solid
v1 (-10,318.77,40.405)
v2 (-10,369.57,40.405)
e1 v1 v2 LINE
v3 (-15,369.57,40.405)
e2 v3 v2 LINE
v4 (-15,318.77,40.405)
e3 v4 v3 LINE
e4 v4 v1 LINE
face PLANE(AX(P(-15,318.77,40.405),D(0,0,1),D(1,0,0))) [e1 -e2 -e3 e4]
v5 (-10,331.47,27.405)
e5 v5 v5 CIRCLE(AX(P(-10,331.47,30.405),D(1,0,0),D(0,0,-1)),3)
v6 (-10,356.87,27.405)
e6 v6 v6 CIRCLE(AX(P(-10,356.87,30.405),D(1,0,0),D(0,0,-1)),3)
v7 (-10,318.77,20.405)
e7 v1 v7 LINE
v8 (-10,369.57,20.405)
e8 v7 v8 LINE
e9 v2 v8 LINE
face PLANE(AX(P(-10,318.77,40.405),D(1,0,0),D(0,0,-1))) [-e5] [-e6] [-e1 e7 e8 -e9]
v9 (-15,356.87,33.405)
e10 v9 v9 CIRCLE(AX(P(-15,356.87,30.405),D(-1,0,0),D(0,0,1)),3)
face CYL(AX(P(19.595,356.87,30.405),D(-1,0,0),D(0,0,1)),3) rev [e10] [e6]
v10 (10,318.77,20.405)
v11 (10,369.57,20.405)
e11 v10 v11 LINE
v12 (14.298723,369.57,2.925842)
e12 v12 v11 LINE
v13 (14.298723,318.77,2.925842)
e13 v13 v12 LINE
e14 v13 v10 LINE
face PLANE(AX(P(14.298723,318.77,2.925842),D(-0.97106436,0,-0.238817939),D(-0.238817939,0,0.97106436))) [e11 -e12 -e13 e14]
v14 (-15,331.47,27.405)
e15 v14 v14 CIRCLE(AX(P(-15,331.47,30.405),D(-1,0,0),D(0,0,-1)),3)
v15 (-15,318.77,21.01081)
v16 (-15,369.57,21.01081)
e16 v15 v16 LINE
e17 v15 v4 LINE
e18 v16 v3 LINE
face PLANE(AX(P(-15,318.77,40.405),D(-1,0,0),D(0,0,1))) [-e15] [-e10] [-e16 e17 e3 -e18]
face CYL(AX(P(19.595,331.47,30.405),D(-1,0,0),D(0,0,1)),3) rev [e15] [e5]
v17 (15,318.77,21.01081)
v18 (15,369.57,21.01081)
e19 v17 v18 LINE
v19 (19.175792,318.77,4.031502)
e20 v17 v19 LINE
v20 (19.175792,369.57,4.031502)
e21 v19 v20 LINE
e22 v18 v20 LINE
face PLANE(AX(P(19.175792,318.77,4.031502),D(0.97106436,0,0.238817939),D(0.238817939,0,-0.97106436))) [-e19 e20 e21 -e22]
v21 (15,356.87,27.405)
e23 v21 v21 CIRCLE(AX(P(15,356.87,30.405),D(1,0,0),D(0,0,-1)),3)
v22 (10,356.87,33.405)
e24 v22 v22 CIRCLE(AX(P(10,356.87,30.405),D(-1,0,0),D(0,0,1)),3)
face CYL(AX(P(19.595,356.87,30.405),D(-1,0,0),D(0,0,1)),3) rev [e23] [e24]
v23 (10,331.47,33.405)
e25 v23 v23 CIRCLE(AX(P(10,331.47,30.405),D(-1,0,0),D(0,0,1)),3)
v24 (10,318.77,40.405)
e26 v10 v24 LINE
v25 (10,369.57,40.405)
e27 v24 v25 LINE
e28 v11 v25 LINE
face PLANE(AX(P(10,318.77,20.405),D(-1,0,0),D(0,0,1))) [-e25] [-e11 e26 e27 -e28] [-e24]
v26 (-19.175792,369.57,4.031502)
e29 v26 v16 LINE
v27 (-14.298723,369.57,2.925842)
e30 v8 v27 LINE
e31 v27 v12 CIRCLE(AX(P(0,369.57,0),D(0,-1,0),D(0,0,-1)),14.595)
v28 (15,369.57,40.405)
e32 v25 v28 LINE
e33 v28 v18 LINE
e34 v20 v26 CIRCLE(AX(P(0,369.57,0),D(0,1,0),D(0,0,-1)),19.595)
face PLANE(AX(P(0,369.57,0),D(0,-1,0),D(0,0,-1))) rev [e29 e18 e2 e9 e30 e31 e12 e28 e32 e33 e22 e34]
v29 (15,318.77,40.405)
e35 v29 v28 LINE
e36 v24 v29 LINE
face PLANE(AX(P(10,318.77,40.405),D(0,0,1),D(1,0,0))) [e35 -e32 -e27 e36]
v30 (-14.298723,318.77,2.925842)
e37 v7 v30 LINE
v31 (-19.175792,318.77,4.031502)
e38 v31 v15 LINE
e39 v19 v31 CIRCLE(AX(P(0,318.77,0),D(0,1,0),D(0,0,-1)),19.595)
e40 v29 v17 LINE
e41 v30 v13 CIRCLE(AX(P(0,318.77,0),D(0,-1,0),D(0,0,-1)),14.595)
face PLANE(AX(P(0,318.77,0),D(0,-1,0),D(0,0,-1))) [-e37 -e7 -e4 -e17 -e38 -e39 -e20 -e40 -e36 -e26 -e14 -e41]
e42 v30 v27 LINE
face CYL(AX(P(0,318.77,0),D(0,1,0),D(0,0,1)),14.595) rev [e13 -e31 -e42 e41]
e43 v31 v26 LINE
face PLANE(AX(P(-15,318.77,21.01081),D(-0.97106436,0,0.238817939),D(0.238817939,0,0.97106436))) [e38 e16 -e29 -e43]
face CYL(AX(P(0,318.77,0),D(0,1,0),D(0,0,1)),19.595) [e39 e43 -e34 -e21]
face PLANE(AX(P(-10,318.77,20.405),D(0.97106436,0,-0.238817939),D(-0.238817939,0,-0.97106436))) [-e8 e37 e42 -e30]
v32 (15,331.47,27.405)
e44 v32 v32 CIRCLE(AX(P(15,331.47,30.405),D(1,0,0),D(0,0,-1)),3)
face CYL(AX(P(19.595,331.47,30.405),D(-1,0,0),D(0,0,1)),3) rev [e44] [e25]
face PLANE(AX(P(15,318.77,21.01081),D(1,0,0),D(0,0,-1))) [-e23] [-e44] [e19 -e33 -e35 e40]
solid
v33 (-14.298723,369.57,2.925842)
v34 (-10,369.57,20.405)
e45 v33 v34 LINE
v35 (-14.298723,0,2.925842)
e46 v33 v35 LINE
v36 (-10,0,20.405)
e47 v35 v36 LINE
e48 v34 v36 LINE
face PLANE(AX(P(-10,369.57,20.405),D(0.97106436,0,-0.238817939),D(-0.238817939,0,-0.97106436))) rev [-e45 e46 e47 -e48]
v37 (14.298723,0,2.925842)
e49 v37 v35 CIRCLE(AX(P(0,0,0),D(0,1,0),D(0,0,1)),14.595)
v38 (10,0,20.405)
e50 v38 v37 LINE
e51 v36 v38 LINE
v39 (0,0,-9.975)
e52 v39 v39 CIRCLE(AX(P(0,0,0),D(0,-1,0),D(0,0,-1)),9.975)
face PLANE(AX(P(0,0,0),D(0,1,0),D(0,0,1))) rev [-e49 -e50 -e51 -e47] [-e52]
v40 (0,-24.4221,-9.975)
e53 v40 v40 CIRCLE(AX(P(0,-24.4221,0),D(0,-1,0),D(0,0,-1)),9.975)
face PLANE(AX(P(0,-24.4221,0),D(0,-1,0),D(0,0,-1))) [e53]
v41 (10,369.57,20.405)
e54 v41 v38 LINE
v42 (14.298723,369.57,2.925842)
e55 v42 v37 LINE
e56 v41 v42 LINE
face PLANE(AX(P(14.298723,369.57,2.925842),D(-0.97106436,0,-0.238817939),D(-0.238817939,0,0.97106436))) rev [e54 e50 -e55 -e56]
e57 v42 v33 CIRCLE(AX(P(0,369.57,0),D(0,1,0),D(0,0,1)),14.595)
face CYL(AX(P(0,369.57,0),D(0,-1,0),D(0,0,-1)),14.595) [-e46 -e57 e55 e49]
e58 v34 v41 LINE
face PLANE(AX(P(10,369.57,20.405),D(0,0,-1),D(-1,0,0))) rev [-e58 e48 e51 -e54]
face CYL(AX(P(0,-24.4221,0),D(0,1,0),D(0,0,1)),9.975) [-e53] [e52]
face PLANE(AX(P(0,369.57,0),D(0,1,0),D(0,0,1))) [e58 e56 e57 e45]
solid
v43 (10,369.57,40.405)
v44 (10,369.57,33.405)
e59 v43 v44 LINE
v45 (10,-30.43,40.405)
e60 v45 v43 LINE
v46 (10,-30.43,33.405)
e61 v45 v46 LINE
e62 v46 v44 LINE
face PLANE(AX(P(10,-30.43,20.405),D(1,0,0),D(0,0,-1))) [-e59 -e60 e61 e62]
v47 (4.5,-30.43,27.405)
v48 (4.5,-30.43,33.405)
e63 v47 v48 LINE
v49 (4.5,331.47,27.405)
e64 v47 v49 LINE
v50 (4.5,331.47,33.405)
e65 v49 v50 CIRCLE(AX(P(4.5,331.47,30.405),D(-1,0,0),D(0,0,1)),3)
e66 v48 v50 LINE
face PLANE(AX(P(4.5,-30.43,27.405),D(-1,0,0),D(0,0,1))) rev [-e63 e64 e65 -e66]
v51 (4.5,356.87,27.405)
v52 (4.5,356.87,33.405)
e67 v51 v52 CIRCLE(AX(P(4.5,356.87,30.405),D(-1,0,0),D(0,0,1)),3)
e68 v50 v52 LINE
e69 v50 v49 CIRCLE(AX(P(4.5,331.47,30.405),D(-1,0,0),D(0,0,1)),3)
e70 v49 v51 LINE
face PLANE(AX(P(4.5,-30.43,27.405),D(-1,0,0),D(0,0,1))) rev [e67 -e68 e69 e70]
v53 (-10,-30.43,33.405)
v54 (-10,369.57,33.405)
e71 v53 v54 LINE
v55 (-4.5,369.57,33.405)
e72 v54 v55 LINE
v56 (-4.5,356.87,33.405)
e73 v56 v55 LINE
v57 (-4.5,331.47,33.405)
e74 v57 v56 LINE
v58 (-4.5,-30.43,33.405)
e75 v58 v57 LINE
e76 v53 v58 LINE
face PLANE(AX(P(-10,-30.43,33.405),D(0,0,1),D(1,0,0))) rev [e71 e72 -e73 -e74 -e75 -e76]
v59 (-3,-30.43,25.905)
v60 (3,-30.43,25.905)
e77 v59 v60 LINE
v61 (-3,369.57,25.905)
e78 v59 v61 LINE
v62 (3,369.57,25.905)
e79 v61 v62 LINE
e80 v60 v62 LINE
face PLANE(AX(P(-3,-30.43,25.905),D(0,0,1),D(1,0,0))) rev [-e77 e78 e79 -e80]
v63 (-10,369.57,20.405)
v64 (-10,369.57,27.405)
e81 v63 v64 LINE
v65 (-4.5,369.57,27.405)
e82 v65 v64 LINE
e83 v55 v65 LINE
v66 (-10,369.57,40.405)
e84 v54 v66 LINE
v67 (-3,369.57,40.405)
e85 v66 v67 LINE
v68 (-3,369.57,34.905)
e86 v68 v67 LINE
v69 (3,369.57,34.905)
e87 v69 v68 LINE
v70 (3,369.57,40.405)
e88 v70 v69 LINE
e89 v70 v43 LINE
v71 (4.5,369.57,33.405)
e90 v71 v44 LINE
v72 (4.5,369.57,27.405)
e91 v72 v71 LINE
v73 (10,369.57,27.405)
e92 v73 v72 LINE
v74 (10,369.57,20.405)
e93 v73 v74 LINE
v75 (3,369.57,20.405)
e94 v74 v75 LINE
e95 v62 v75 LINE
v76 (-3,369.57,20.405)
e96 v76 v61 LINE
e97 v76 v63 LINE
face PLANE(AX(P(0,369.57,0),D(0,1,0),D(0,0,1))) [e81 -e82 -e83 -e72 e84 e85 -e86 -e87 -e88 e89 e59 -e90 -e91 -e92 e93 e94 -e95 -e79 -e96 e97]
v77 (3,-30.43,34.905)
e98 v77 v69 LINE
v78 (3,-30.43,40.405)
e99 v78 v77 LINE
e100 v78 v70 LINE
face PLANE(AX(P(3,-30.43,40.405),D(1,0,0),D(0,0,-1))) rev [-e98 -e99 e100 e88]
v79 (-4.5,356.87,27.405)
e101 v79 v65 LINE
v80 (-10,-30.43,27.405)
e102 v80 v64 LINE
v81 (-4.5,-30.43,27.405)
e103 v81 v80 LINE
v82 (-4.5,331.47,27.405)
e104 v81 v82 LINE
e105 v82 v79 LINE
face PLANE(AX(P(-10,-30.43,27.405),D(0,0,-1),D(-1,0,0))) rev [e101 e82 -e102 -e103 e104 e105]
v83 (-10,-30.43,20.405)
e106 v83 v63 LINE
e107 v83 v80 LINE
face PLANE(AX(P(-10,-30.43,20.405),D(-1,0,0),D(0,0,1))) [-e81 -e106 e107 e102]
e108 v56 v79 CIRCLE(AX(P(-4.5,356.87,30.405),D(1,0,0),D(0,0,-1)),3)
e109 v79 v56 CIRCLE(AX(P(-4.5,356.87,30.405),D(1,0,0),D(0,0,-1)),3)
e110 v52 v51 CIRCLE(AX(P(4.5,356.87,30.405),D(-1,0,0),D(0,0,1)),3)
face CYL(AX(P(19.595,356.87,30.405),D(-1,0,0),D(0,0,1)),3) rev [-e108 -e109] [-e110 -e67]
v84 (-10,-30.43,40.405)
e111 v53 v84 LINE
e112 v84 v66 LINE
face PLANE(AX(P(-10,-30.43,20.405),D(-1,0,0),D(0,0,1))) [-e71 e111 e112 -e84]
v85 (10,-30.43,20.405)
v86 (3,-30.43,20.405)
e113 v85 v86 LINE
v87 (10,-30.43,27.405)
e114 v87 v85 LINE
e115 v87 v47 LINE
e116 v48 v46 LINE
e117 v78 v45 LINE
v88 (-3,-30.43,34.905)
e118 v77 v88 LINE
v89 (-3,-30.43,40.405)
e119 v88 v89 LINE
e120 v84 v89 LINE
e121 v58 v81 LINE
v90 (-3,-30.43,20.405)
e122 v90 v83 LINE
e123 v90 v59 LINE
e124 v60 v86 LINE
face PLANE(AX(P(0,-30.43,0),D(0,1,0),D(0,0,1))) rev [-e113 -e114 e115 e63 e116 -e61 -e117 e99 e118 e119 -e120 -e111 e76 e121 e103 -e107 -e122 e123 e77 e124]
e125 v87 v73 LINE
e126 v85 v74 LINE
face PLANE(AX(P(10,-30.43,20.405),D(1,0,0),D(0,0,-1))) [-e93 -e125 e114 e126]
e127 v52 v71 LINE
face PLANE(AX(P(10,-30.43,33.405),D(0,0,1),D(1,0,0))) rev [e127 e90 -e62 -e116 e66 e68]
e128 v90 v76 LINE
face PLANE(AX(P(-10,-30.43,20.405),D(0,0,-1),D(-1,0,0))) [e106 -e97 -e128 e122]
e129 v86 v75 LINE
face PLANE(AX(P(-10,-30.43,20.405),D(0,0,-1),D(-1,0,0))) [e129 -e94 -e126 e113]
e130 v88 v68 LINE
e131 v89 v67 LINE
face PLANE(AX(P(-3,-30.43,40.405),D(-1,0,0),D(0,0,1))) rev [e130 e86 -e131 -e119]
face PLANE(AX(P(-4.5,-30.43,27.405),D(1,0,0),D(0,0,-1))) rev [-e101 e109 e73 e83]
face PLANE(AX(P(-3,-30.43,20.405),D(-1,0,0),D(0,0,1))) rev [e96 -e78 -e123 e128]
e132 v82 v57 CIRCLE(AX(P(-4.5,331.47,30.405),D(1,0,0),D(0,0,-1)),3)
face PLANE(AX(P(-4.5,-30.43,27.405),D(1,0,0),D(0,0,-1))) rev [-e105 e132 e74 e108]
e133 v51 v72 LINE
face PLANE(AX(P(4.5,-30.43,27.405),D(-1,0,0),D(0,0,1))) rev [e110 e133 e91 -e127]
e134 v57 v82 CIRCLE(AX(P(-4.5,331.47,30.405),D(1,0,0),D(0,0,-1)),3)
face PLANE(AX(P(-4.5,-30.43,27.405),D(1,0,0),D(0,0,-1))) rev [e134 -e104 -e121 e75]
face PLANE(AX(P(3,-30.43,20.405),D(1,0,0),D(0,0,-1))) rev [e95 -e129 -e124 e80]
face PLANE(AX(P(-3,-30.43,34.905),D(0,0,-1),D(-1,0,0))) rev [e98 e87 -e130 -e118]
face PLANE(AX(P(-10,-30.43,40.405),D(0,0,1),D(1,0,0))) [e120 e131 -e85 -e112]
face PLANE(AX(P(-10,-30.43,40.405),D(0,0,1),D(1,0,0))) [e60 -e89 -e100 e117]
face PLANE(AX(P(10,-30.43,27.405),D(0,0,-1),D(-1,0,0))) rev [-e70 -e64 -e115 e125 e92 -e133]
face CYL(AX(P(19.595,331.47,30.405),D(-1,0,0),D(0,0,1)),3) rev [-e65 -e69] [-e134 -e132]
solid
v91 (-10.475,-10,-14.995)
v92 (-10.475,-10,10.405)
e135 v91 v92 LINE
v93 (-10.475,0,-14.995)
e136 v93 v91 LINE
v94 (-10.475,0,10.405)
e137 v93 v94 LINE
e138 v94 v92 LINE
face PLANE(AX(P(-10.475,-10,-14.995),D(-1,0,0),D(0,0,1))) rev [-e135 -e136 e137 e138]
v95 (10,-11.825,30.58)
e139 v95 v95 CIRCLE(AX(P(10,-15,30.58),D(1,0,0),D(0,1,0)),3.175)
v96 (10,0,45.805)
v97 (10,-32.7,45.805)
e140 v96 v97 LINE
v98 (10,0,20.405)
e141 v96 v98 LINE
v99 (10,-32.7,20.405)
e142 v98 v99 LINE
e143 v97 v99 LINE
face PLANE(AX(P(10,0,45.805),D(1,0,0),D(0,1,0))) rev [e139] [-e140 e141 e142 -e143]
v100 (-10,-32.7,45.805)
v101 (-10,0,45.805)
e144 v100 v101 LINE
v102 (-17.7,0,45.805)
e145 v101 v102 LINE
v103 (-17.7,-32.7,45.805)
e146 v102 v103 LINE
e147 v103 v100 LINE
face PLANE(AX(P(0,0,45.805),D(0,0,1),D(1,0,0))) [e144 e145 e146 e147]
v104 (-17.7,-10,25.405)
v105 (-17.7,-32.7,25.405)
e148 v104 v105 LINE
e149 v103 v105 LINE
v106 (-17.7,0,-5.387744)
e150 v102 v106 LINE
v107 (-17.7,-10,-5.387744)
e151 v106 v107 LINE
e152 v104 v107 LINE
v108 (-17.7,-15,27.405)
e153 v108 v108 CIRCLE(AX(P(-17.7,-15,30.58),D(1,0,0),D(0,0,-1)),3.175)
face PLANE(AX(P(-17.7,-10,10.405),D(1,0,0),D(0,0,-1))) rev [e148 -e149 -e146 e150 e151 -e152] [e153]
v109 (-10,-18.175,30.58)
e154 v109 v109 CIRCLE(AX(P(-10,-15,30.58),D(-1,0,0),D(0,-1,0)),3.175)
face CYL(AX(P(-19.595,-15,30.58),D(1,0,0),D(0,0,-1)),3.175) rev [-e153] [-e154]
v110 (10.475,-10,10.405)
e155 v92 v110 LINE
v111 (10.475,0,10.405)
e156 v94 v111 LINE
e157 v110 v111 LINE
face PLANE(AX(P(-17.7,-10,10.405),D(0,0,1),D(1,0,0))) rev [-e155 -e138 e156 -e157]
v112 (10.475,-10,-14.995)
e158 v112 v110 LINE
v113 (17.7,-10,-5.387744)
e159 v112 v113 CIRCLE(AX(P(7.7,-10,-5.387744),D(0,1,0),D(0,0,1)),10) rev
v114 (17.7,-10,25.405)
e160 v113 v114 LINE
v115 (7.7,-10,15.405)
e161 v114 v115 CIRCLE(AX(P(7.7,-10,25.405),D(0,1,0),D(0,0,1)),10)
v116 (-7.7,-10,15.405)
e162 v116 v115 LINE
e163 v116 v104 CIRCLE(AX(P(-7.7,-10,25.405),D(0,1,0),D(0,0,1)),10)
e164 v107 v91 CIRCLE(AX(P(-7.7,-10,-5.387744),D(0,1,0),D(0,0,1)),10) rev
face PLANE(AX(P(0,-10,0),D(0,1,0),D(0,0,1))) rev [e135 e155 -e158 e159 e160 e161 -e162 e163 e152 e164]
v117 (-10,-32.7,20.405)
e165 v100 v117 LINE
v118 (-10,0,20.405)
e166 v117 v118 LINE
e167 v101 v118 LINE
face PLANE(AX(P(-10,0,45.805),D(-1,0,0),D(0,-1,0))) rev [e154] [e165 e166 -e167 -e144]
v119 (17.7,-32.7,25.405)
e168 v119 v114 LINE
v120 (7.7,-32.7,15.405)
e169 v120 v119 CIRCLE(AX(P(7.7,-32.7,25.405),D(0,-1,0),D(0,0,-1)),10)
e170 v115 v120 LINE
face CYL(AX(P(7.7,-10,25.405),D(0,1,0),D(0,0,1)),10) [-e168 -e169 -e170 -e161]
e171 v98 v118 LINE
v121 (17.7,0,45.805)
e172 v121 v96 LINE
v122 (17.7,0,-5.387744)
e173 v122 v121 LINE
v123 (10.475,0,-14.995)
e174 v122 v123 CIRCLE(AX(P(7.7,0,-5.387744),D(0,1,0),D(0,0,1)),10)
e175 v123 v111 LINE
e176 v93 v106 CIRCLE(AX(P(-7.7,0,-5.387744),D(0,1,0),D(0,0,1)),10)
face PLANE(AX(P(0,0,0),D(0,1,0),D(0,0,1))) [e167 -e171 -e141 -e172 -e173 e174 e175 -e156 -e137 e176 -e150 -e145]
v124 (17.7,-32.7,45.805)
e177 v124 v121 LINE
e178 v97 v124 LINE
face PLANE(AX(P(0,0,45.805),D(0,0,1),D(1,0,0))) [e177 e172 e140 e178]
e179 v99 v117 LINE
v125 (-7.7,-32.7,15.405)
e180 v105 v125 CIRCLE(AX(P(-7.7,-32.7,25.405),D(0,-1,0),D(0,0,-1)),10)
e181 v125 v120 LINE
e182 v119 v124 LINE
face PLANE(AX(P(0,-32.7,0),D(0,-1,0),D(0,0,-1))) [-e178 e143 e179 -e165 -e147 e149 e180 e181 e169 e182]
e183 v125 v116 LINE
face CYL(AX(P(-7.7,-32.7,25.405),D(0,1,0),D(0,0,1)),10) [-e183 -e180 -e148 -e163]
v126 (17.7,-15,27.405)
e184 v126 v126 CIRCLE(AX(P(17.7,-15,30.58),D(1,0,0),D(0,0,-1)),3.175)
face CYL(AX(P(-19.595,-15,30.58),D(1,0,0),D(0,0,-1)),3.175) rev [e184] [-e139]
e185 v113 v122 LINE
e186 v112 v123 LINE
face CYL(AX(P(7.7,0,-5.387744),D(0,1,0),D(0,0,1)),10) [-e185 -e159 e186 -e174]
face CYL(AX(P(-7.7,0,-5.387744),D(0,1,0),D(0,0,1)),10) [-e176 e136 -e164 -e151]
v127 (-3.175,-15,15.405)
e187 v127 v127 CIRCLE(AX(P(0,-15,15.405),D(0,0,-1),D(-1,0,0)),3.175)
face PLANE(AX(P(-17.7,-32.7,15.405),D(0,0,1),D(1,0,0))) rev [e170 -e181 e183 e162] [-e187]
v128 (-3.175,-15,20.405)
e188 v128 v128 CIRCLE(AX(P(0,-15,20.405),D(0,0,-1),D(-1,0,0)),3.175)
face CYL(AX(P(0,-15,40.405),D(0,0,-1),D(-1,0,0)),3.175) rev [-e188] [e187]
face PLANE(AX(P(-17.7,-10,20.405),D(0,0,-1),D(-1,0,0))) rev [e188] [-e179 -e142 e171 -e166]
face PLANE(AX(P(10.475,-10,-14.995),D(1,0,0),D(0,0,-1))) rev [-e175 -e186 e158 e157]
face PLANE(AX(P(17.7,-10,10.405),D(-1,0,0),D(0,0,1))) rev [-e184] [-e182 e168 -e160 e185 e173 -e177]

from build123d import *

# Parameters (mm, degrees)
BOSS_EXTRUDE1_DEPTH = 369.57
SKETCH2_W           = 20
SKETCH2_H           = 20
BOSS_EXTRUDE2_DEPTH = 400
SKETCH7_W           = 5.5
SKETCH7_H           = 6
SKETCH7_W_2         = 6
SKETCH7_H_2         = 5.5
CUT_EXTRUDE3_DEPTH  = 403.300358004
BOSS_EXTRUDE3_DEPTH = 50.8
SKETCH9_R           = 3
CUT_EXTRUDE4_DEPTH  = 374.378310765
SKETCH10_R          = 9.975
BOSS_EXTRUDE4_DEPTH = 24.4221
SKETCH11_W          = 35.4
SKETCH11_H          = 10
BOSS_EXTRUDE5_DEPTH = 10
SKETCH12_W          = 35.4
SKETCH12_H          = 5
BOSS_EXTRUDE6_DEPTH = 22.7
SKETCH14_R          = 3.175
CUT_EXTRUDE5_DEPTH  = 372.74043219
SKETCH15_W          = 7.7
SKETCH15_H          = 32.7
BOSS_EXTRUDE7_DEPTH = 25.4
SKETCH16_R          = 3.175
CUT_EXTRUDE6_DEPTH  = 375.260604325
SKETCH17_W          = 7.225
SKETCH17_H          = 10
BOSS_EXTRUDE8_DEPTH = 25.4
FILLET1_R           = 10


with BuildPart() as part:
    # Sketch1 → Boss-Extrude1 (new body)
    with BuildSketch(Plane(origin=(0, 0, 0), x_dir=(1, 0, 0), z_dir=(0, 1, 0))):
        with BuildLine():
            Line((14.298722896, -2.925841512), (10, -20.405))
            Line((10, -20.405), (-10, -20.405))
            Line((-10, -20.405), (-14.298722896, -2.925841512))
            ThreePointArc((-14.298722896, -2.925841512), (0, 14.595), (14.298722896, -2.925841512))
        make_face()
    extrude(amount=BOSS_EXTRUDE1_DEPTH)

    # Sketch10 → Boss-Extrude4 (add)
    with BuildSketch(Plane.XZ):
        with Locations(Location((0, 0, 0), (0, 0, 270))):
            Circle(SKETCH10_R)
    extrude(amount=BOSS_EXTRUDE4_DEPTH)


with BuildPart() as body_2:
    # Sketch2 → Boss-Extrude2 (new body)
    with BuildSketch(Plane(origin=(0, 369.57, 0), x_dir=(1, 0, 0), z_dir=(0, 1, 0))):
        with Locations((0, -30.405)):
            Rectangle(SKETCH2_W, SKETCH2_H)
    extrude(amount=-BOSS_EXTRUDE2_DEPTH)

    # Sketch7 → Cut-Extrude3 (cut, through all)
    with BuildSketch(Plane(origin=(0, 369.57, 0), x_dir=(1, 0, 0), z_dir=(0, 1, 0))):
        with Locations((7.25, -30.405)):
            Rectangle(SKETCH7_W, SKETCH7_H)
        with Locations((-7.25, -30.405)):
            Rectangle(SKETCH7_W, SKETCH7_H)
        with Locations((0, -23.155)):
            Rectangle(SKETCH7_W_2, SKETCH7_H_2)
        with Locations((0, -37.655)):
            Rectangle(SKETCH7_W_2, SKETCH7_H_2)
    extrude(amount=-CUT_EXTRUDE3_DEPTH, mode=Mode.SUBTRACT)


with BuildPart() as body_3:
    # Sketch8 → Boss-Extrude3 (new body)
    with BuildSketch(Plane(origin=(0, 369.57, 0), x_dir=(1, 0, 0), z_dir=(0, 1, 0))):
        with BuildLine():
            Line((-10, -40.405), (-10, -20.405))
            Line((-10, -20.405), (-14.298722896, -2.925841512))
            ThreePointArc((-14.298722896, -2.925841512), (0, 14.595), (14.298722896, -2.925841512))
            Line((14.298722896, -2.925841512), (10, -20.405))
            Line((10, -20.405), (10, -40.405))
            Line((10, -40.405), (15, -40.405))
            Line((15, -40.405), (15, -21.010809591))
            Line((15, -21.010809591), (19.175792464, -4.031502))
            ThreePointArc((19.175792464, -4.031502), (0, 19.595), (-19.175792464, -4.031502))
            Line((-19.175792464, -4.031502), (-15, -21.010809591))
            Line((-15, -21.010809591), (-15, -40.405))
            Line((-15, -40.405), (-10, -40.405))
        make_face()
    extrude(amount=-BOSS_EXTRUDE3_DEPTH)


with BuildPart() as cut_extrude4_tool:
    # Sketch9 → Cut-Extrude4 (new, through all)
    with BuildSketch(Plane.ZY.offset(15)):
        with Locations((30.405, 356.87)):
            Circle(SKETCH9_R)
        with Locations(Location((30.405, 331.47, 0), (0, 0, 180))):
            Circle(SKETCH9_R)
    extrude(amount=-CUT_EXTRUDE4_DEPTH)


with BuildPart() as body_2_1:
    add(body_2.part)

    # Cut-Extrude4: cut by cut_extrude4_tool
    add(cut_extrude4_tool.part, mode=Mode.SUBTRACT)


with BuildPart() as body_3_1:
    add(body_3.part)

    # Cut-Extrude4: cut by cut_extrude4_tool
    add(cut_extrude4_tool.part, mode=Mode.SUBTRACT)


with BuildPart() as body_4:
    # Sketch11 → Boss-Extrude5 (new body)
    with BuildSketch(Plane.XZ):
        with Locations((0, 15.405)):
            Rectangle(SKETCH11_W, SKETCH11_H)
    extrude(amount=BOSS_EXTRUDE5_DEPTH)

    # Sketch12 → Boss-Extrude6 (add)
    with BuildSketch(Plane.XZ.offset(10)):
        with Locations((0, 17.905)):
            Rectangle(SKETCH12_W, SKETCH12_H)
    extrude(amount=BOSS_EXTRUDE6_DEPTH)

    # Sketch14 → Cut-Extrude5 (cut, through all)
    with BuildSketch(Plane(origin=(0, 0, 15.405), x_dir=(-1, 0, 0), z_dir=(0, 0, -1))):
        with Locations((0, -15)):
            Circle(SKETCH14_R)
    extrude(amount=-CUT_EXTRUDE5_DEPTH, mode=Mode.SUBTRACT)

    # Sketch15 → Boss-Extrude7 (add)
    with BuildSketch(Plane.XY.offset(20.405)):
        with Locations((-13.85, -16.35)):
            Rectangle(SKETCH15_W, SKETCH15_H)
        with Locations((13.85, -16.35)):
            Rectangle(SKETCH15_W, SKETCH15_H)
    extrude(amount=BOSS_EXTRUDE7_DEPTH)

    # Sketch16 → Cut-Extrude6 (cut, through all)
    with BuildSketch(Plane(origin=(17.7, 0, 0), x_dir=(0, 0, -1), z_dir=(1, 0, 0))):
        with Locations((-30.58, -15)):
            Circle(SKETCH16_R)
    extrude(amount=-CUT_EXTRUDE6_DEPTH, mode=Mode.SUBTRACT)

    # Sketch17 → Boss-Extrude8 (add)
    with BuildSketch(Plane(origin=(0, 0, 10.405), x_dir=(-1, 0, 0), z_dir=(0, 0, -1))):
        with Locations((14.0875, -5)):
            Rectangle(SKETCH17_W, SKETCH17_H)
        with Locations((-14.0875, -5)):
            Rectangle(SKETCH17_W, SKETCH17_H)
    extrude(amount=BOSS_EXTRUDE8_DEPTH)

    # Fillet1
    # the kernel refuses this fillet: 10 mm, written as the material it takes off along each edge
    with BuildSketch(Plane(origin=(17.7, -10, 15.405), x_dir=(0, 0, 1), z_dir=(0, -1, 0))) as fillet1_piece_1:
        with BuildLine():
            CenterArc((FILLET1_R, FILLET1_R), FILLET1_R, 180, 90)
            Line((0, FILLET1_R), (0, 0))
            Line((0, 0), (FILLET1_R, 0))
        make_face()
    extrude(amount=47.7, mode=Mode.SUBTRACT)
    with BuildSketch(Plane(origin=(-17.7, -10, 15.405), x_dir=(0, 0, 1), z_dir=(0, -1, 0))) as fillet1_piece_2:
        with BuildLine():
            CenterArc((FILLET1_R, -FILLET1_R), FILLET1_R, 90, 90)
            Line((0, -FILLET1_R), (0, 0))
            Line((0, 0), (FILLET1_R, 0))
        make_face()
    extrude(amount=47.7, mode=Mode.SUBTRACT)
    with BuildSketch(Plane(origin=(17.7, -34.01814093, -14.995), x_dir=(0, 0, 1), z_dir=(0, 1, 0))) as fillet1_piece_3:
        with BuildLine():
            CenterArc((9.607256372, -10), FILLET1_R, 90, 73.888946597)
            Line((0, -7.225), (0, 0))
            Line((0, 0), (9.607256372, 0))
        make_face()
    extrude(amount=58.036281861, mode=Mode.SUBTRACT)
    with BuildSketch(Plane(origin=(-17.7, 24.01814093, -14.995), x_dir=(1, 0, 0), z_dir=(0, -1, 0))) as fillet1_piece_4:
        with BuildLine():
            CenterArc((10, 9.607256372), FILLET1_R, 180, 73.888946597)
            Line((0, 9.607256372), (0, 0))
            Line((0, 0), (7.225, 0))
        make_face()
    extrude(amount=58.036281861, mode=Mode.SUBTRACT)


solid = Compound([part.part, body_2_1.part, body_3_1.part, body_4.part])
